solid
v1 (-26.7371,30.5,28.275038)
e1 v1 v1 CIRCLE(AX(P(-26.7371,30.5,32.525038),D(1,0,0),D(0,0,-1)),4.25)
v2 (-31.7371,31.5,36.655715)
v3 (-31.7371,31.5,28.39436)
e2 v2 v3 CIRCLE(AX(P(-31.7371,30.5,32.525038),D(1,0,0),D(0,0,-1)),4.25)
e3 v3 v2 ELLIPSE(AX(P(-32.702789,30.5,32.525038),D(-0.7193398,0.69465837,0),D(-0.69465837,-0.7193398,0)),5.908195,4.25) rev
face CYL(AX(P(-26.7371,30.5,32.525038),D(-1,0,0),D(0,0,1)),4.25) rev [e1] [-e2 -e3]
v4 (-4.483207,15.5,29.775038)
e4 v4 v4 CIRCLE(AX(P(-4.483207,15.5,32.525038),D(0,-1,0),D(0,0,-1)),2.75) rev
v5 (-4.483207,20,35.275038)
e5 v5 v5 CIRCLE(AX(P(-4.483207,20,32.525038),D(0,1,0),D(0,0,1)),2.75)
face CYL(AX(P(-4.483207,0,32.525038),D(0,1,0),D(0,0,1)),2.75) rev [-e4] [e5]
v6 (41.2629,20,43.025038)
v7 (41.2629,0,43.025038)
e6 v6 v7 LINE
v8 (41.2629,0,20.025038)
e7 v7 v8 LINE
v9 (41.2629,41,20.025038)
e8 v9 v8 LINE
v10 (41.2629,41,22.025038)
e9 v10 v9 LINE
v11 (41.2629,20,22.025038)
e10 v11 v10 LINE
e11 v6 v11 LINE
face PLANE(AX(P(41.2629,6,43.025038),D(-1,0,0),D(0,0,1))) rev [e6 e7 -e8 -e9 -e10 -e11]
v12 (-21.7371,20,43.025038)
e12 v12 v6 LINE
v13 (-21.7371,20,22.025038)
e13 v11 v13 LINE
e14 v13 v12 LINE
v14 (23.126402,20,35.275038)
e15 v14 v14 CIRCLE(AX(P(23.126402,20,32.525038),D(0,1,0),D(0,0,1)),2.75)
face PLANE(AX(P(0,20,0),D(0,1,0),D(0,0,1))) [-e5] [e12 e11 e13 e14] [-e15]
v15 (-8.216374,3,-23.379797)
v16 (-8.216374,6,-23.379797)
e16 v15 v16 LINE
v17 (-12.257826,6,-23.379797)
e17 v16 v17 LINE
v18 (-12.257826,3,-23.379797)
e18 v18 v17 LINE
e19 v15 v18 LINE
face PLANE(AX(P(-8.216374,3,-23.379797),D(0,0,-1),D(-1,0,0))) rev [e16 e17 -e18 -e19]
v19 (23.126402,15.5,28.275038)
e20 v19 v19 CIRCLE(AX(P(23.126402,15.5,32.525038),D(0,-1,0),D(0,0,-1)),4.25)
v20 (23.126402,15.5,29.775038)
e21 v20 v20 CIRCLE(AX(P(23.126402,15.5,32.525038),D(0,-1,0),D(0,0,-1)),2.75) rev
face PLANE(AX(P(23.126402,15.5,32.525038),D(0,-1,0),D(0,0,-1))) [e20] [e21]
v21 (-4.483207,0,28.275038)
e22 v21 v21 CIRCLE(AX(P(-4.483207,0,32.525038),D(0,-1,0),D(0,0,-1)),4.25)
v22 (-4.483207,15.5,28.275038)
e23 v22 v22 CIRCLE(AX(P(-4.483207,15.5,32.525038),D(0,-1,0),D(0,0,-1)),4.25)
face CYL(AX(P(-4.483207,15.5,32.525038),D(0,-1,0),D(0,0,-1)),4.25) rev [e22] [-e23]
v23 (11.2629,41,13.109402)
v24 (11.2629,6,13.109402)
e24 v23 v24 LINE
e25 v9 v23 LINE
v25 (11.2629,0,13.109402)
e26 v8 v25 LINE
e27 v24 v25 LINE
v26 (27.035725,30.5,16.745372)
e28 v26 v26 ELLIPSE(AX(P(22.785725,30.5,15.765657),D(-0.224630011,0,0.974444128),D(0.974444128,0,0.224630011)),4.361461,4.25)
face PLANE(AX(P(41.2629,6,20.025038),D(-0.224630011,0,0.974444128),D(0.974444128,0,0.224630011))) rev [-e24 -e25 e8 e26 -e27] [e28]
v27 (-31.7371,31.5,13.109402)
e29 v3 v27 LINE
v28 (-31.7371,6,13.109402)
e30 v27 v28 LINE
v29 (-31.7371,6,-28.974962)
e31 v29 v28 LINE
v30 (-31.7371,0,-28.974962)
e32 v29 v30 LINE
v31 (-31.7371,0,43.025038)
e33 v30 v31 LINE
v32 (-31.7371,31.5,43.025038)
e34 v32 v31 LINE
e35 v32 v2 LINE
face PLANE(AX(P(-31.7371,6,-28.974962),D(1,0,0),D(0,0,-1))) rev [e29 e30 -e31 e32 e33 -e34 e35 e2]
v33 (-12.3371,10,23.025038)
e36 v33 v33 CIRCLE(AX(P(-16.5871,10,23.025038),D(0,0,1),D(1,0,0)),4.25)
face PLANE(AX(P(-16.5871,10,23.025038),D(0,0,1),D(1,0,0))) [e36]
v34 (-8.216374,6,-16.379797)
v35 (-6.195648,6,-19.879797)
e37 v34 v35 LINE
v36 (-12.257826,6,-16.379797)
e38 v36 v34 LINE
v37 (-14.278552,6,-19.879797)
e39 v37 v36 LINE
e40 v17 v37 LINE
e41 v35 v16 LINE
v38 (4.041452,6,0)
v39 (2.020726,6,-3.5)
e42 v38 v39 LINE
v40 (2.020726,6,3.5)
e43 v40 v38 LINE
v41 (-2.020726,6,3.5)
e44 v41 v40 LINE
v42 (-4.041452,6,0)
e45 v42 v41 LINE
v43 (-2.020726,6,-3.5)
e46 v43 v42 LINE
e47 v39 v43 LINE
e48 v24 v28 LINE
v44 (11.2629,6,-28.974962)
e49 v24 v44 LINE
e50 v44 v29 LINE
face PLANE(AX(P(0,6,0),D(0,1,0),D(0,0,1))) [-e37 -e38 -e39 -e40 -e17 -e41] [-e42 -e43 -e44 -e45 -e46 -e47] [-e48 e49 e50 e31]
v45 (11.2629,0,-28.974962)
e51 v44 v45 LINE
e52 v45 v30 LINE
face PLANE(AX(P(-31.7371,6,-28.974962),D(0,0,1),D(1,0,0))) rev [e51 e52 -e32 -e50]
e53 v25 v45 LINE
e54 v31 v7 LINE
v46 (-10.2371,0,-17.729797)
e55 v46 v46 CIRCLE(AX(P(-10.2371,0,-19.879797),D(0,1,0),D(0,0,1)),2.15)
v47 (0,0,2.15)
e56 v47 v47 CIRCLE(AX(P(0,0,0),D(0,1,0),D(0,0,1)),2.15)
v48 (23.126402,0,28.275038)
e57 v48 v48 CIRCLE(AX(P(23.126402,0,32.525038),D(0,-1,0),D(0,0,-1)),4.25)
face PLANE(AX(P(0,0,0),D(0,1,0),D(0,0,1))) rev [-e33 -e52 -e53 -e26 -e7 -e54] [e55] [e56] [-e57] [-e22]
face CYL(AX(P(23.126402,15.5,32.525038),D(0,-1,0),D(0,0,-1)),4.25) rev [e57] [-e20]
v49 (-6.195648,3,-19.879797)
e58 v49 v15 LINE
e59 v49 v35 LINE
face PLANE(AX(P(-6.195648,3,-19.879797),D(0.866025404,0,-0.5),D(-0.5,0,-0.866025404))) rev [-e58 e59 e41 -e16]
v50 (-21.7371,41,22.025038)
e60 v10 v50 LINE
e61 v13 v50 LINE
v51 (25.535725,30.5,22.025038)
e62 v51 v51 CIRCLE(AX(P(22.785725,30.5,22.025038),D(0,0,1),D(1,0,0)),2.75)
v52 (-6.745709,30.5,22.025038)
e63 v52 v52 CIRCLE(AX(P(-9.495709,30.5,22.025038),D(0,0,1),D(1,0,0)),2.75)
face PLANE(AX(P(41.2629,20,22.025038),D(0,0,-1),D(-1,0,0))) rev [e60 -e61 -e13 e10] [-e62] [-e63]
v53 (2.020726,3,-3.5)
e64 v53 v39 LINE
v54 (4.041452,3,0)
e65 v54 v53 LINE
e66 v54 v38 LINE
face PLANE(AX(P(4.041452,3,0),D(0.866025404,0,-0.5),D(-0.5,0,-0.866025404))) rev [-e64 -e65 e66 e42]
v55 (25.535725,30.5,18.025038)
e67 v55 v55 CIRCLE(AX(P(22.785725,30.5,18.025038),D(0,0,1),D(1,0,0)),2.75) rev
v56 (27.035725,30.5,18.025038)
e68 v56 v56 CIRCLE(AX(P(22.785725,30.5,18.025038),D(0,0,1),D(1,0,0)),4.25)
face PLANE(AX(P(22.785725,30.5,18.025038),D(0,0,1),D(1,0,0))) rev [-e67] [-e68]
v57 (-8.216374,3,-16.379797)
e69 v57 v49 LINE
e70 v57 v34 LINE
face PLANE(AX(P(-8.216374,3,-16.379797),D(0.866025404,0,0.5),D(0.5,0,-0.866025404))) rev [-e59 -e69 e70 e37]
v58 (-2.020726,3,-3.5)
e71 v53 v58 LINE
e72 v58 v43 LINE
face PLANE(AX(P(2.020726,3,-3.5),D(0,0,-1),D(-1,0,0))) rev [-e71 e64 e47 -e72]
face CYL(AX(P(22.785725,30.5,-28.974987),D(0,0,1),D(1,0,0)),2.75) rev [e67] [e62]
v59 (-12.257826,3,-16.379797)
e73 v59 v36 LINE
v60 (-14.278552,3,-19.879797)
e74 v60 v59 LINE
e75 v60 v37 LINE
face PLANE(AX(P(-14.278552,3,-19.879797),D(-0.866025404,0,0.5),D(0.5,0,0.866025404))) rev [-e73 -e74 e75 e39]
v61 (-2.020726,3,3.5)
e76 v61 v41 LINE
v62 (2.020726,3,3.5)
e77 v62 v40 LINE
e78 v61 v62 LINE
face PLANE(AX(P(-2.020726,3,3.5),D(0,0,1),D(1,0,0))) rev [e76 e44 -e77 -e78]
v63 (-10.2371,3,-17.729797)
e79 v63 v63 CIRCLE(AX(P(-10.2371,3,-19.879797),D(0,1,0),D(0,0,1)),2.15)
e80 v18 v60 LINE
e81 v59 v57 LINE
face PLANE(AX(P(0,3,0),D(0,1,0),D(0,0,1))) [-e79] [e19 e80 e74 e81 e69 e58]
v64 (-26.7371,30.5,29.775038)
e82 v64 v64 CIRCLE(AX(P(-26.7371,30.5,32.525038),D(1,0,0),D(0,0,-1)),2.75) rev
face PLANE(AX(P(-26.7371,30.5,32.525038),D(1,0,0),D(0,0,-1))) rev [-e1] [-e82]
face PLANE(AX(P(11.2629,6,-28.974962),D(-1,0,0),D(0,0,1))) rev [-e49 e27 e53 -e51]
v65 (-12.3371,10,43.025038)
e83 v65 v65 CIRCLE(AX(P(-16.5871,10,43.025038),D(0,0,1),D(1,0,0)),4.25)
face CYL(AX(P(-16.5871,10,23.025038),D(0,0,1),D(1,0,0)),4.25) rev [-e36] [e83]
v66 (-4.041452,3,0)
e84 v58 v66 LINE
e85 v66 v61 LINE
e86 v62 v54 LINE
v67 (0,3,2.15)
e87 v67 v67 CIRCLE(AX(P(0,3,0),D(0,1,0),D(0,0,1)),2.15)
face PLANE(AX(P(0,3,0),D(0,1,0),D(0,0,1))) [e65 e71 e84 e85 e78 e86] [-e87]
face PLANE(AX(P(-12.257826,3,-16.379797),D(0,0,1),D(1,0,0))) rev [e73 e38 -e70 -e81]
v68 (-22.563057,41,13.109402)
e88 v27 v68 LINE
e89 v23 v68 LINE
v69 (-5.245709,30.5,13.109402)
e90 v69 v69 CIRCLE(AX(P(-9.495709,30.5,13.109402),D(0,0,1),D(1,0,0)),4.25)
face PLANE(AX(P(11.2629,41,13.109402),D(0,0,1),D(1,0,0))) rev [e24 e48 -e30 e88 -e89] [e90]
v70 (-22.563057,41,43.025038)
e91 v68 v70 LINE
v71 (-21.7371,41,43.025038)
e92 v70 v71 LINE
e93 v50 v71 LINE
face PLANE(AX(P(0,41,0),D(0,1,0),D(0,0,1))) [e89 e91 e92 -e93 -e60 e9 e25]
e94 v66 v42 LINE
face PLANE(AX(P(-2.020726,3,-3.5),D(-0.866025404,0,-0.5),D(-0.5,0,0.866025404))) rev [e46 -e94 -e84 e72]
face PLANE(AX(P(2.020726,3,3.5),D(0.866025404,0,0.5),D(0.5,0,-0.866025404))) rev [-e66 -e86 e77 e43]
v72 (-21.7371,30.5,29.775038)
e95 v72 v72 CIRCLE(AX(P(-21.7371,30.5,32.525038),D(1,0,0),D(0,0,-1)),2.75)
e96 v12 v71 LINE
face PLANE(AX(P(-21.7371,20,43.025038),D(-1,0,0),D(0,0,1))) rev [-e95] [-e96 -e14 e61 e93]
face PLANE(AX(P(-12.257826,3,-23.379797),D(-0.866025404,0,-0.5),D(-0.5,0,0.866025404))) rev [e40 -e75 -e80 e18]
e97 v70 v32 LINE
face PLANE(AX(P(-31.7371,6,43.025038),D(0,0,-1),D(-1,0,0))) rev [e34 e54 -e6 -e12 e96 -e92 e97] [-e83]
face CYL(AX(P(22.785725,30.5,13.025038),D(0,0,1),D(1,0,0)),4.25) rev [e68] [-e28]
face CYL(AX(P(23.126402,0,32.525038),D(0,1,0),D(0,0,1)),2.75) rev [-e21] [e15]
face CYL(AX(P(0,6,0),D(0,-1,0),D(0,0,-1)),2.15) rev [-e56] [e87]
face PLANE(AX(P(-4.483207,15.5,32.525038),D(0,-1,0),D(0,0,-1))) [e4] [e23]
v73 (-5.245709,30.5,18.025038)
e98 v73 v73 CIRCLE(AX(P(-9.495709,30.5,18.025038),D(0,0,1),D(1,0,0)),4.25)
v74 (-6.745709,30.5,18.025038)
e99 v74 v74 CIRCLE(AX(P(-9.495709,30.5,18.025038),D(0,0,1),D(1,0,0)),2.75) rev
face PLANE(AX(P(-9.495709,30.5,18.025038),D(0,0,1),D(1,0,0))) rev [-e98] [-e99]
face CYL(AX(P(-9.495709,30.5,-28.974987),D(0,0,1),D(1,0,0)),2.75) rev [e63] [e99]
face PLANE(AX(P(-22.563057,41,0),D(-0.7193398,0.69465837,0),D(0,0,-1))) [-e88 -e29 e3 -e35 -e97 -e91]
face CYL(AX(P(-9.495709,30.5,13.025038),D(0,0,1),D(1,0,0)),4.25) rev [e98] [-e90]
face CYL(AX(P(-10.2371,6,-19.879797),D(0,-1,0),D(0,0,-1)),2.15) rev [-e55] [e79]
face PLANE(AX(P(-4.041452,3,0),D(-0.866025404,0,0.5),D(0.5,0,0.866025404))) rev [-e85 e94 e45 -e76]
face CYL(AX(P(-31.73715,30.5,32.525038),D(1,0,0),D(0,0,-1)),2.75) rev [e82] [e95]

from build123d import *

# Parameters (mm, degrees)
SKETCH_1_R          = 2.15
EXTRUDE_1_DEPTH     = 6
EXTRUDE_2_DEPTH     = 35
SKETCH_3_W          = 63
SKETCH_3_H          = 21
CUT_EXTRUDE_1_DEPTH = 21
SKETCH_4_R          = 2.75
CUT_EXTRUDE_2_DEPTH = 87.609201921
CHAMFER_1_SIZE      = 9.5
CHAMFER_1_SIZE_2    = 9.174043361
CUT_EXTRUDE_START   = -10
SKETCH_5_R          = 4.25
CUT_EXTRUDE_3_DEPTH = 5
SKETCH_6_R          = 2.75
CUT_EXTRUDE_4_DEPTH = 78.360370477
CUT_EXTRUDE_START_2 = -4
SKETCH_7_R          = 4.25
CUT_EXTRUDE_5_DEPTH = 5
SKETCH_8_R          = 2.75
CUT_EXTRUDE_6_DEPTH = 64.20427816
SKETCH_10_R         = 4.25
CUT_EXTRUDE_7_DEPTH = 15.5
SKETCH_11_R         = 4.25
CUT_EXTRUDE_8_DEPTH = 20
CUT_EXTRUDE_9_DEPTH = 3


with BuildPart() as part:
    # Эскиз1 → Бобышка-Вытянуть1 (new body)
    with BuildSketch(Plane(origin=(0, 0, 0), x_dir=(1, 0, 0), z_dir=(0, 1, 0))):
        Polygon((-31.737099952, -43.025037564), (41.262900048, -43.025037564), (41.262900048, -20.025037564), (11.262900048, -13.109402144), (11.262900048, 28.974962436), (-31.737099952, 28.974962436), align=None)
        with Locations(Location((-10.237099952, 19.879797383, 0), (0, 0, 270))):
            Circle(SKETCH_1_R, mode=Mode.SUBTRACT)
        with Locations(Location((0, 0, 0), (0, 0, 270))):
            Circle(SKETCH_1_R, mode=Mode.SUBTRACT)
    extrude(amount=EXTRUDE_1_DEPTH)

    # Эскиз2 → Бобышка-Вытянуть2 (add)
    with BuildSketch(Plane(origin=(0, 6, 0), x_dir=(1, 0, 0), z_dir=(0, 1, 0))):
        Polygon((41.262900048, -20.025037564), (11.262900048, -13.109402144), (-31.737099952, -13.109402144), (-31.737099952, -43.025037564), (41.262900048, -43.025037564), align=None)
    extrude(amount=EXTRUDE_2_DEPTH)

    # Эскиз3 → Вырез-Вытянуть1 (cut)
    with BuildSketch(Plane(origin=(0, 41, 0), x_dir=(1, 0, 0), z_dir=(0, 1, 0))):
        with Locations((9.762900048, -32.525037564)):
            Rectangle(SKETCH_3_W, SKETCH_3_H)
    extrude(amount=-CUT_EXTRUDE_1_DEPTH, mode=Mode.SUBTRACT)

    # Эскиз4 → Вырез-Вытянуть2 (cut, through all)
    with BuildSketch(Plane(origin=(-21.737099952, 0, 0), x_dir=(0, 0, -1), z_dir=(1, 0, 0))):
        with Locations((-32.525037564, 30.5)):
            Circle(SKETCH_4_R)
    extrude(amount=-CUT_EXTRUDE_2_DEPTH, mode=Mode.SUBTRACT)

    # Фаска1
    # the kernel refuses this chamfer: 9.5, 9.174043361 mm, written as the material it takes off along each edge
    with BuildSketch(Plane(origin=(-31.737099952, 41, -11.332881065), x_dir=(-0.026999337430198715, -0.9996354514413394, 0), z_dir=(0, 0, 1))) as chamfer_1_piece_1:
        Polygon((CHAMFER_1_SIZE * 0.999635451441, CHAMFER_1_SIZE * 0.0269993374302), (-CHAMFER_1_SIZE_2 * 0.0269993374292, CHAMFER_1_SIZE_2 * 0.999635451405), (0, 0), align=None)
    extrude(amount=78.800201839, mode=Mode.SUBTRACT)

    # Эскиз5 → Вырез-Вытянуть3 (cut)
    with BuildSketch(Plane(origin=(-21.737099952, 0, 0), x_dir=(0, 0, -1), z_dir=(1, 0, 0)).offset(CUT_EXTRUDE_START)):
        with Locations(Location((-32.525037564, 30.5, 0), (0, 0, 166.391039369))):
            Circle(SKETCH_5_R)
    extrude(amount=CUT_EXTRUDE_3_DEPTH, mode=Mode.SUBTRACT)

    # Эскиз6 → Вырез-Вытянуть4 (cut, through all)
    with BuildSketch(Plane.XY.offset(22.025037564)):
        with Locations((-9.495708976, 30.5)):
            Circle(SKETCH_6_R)
        with Locations((22.785725254, 30.5)):
            Circle(SKETCH_6_R)
    extrude(amount=-CUT_EXTRUDE_4_DEPTH, mode=Mode.SUBTRACT)

    # Эскиз7 → Вырез-Вытянуть5 (cut)
    with BuildSketch(Plane.XY.offset(22.025037564).offset(CUT_EXTRUDE_START_2)):
        with Locations((-9.495708976, 30.5)):
            Circle(SKETCH_7_R)
        with Locations((22.785725254, 30.5)):
            Circle(SKETCH_7_R)
    extrude(amount=-CUT_EXTRUDE_5_DEPTH, mode=Mode.SUBTRACT)

    # Эскиз8 → Вырез-Вытянуть6 (cut, through all)
    with BuildSketch(Plane(origin=(0, 20, 0), x_dir=(1, 0, 0), z_dir=(0, 1, 0))):
        with Locations(Location((-4.483206982, -32.525037564, 0), (0, 0, 270))):
            Circle(SKETCH_8_R)
        with Locations(Location((23.126402015, -32.525037564, 0), (0, 0, 270))):
            Circle(SKETCH_8_R)
    extrude(amount=-CUT_EXTRUDE_6_DEPTH, mode=Mode.SUBTRACT)

    # Эскиз10 → Вырез-Вытянуть7 (cut)
    with BuildSketch(Plane.XZ):
        with Locations(Location((23.126402015, 32.525037564, 0), (0, 0, 270))):
            Circle(SKETCH_10_R)
        with Locations(Location((-4.483206982, 32.525037564, 0), (0, 0, 270))):
            Circle(SKETCH_10_R)
    extrude(amount=-CUT_EXTRUDE_7_DEPTH, mode=Mode.SUBTRACT)

    # Эскиз11 → Вырез-Вытянуть8 (cut)
    with BuildSketch(Plane.XY.offset(43.025037564)):
        with Locations((-16.587099952, 10)):
            Circle(SKETCH_11_R)
    extrude(amount=-CUT_EXTRUDE_8_DEPTH, mode=Mode.SUBTRACT)

    # Эскиз12 → Вырез-Вытянуть9 (cut)
    with BuildSketch(Plane(origin=(0, 6, 0), x_dir=(1, 0, 0), z_dir=(0, 1, 0))):
        Polygon((-6.195648068, 19.879797383), (-8.21637401, 23.379797383), (-12.257825894, 23.379797383), (-14.278551837, 19.879797383), (-12.257825894, 16.379797383), (-8.21637401, 16.379797383), align=None)
        Polygon((4.041451884, 0), (2.020725942, 3.5), (-2.020725942, 3.5), (-4.041451884, 0), (-2.020725942, -3.5), (2.020725942, -3.5), align=None)
    extrude(amount=-CUT_EXTRUDE_9_DEPTH, mode=Mode.SUBTRACT)


solid = part.part
